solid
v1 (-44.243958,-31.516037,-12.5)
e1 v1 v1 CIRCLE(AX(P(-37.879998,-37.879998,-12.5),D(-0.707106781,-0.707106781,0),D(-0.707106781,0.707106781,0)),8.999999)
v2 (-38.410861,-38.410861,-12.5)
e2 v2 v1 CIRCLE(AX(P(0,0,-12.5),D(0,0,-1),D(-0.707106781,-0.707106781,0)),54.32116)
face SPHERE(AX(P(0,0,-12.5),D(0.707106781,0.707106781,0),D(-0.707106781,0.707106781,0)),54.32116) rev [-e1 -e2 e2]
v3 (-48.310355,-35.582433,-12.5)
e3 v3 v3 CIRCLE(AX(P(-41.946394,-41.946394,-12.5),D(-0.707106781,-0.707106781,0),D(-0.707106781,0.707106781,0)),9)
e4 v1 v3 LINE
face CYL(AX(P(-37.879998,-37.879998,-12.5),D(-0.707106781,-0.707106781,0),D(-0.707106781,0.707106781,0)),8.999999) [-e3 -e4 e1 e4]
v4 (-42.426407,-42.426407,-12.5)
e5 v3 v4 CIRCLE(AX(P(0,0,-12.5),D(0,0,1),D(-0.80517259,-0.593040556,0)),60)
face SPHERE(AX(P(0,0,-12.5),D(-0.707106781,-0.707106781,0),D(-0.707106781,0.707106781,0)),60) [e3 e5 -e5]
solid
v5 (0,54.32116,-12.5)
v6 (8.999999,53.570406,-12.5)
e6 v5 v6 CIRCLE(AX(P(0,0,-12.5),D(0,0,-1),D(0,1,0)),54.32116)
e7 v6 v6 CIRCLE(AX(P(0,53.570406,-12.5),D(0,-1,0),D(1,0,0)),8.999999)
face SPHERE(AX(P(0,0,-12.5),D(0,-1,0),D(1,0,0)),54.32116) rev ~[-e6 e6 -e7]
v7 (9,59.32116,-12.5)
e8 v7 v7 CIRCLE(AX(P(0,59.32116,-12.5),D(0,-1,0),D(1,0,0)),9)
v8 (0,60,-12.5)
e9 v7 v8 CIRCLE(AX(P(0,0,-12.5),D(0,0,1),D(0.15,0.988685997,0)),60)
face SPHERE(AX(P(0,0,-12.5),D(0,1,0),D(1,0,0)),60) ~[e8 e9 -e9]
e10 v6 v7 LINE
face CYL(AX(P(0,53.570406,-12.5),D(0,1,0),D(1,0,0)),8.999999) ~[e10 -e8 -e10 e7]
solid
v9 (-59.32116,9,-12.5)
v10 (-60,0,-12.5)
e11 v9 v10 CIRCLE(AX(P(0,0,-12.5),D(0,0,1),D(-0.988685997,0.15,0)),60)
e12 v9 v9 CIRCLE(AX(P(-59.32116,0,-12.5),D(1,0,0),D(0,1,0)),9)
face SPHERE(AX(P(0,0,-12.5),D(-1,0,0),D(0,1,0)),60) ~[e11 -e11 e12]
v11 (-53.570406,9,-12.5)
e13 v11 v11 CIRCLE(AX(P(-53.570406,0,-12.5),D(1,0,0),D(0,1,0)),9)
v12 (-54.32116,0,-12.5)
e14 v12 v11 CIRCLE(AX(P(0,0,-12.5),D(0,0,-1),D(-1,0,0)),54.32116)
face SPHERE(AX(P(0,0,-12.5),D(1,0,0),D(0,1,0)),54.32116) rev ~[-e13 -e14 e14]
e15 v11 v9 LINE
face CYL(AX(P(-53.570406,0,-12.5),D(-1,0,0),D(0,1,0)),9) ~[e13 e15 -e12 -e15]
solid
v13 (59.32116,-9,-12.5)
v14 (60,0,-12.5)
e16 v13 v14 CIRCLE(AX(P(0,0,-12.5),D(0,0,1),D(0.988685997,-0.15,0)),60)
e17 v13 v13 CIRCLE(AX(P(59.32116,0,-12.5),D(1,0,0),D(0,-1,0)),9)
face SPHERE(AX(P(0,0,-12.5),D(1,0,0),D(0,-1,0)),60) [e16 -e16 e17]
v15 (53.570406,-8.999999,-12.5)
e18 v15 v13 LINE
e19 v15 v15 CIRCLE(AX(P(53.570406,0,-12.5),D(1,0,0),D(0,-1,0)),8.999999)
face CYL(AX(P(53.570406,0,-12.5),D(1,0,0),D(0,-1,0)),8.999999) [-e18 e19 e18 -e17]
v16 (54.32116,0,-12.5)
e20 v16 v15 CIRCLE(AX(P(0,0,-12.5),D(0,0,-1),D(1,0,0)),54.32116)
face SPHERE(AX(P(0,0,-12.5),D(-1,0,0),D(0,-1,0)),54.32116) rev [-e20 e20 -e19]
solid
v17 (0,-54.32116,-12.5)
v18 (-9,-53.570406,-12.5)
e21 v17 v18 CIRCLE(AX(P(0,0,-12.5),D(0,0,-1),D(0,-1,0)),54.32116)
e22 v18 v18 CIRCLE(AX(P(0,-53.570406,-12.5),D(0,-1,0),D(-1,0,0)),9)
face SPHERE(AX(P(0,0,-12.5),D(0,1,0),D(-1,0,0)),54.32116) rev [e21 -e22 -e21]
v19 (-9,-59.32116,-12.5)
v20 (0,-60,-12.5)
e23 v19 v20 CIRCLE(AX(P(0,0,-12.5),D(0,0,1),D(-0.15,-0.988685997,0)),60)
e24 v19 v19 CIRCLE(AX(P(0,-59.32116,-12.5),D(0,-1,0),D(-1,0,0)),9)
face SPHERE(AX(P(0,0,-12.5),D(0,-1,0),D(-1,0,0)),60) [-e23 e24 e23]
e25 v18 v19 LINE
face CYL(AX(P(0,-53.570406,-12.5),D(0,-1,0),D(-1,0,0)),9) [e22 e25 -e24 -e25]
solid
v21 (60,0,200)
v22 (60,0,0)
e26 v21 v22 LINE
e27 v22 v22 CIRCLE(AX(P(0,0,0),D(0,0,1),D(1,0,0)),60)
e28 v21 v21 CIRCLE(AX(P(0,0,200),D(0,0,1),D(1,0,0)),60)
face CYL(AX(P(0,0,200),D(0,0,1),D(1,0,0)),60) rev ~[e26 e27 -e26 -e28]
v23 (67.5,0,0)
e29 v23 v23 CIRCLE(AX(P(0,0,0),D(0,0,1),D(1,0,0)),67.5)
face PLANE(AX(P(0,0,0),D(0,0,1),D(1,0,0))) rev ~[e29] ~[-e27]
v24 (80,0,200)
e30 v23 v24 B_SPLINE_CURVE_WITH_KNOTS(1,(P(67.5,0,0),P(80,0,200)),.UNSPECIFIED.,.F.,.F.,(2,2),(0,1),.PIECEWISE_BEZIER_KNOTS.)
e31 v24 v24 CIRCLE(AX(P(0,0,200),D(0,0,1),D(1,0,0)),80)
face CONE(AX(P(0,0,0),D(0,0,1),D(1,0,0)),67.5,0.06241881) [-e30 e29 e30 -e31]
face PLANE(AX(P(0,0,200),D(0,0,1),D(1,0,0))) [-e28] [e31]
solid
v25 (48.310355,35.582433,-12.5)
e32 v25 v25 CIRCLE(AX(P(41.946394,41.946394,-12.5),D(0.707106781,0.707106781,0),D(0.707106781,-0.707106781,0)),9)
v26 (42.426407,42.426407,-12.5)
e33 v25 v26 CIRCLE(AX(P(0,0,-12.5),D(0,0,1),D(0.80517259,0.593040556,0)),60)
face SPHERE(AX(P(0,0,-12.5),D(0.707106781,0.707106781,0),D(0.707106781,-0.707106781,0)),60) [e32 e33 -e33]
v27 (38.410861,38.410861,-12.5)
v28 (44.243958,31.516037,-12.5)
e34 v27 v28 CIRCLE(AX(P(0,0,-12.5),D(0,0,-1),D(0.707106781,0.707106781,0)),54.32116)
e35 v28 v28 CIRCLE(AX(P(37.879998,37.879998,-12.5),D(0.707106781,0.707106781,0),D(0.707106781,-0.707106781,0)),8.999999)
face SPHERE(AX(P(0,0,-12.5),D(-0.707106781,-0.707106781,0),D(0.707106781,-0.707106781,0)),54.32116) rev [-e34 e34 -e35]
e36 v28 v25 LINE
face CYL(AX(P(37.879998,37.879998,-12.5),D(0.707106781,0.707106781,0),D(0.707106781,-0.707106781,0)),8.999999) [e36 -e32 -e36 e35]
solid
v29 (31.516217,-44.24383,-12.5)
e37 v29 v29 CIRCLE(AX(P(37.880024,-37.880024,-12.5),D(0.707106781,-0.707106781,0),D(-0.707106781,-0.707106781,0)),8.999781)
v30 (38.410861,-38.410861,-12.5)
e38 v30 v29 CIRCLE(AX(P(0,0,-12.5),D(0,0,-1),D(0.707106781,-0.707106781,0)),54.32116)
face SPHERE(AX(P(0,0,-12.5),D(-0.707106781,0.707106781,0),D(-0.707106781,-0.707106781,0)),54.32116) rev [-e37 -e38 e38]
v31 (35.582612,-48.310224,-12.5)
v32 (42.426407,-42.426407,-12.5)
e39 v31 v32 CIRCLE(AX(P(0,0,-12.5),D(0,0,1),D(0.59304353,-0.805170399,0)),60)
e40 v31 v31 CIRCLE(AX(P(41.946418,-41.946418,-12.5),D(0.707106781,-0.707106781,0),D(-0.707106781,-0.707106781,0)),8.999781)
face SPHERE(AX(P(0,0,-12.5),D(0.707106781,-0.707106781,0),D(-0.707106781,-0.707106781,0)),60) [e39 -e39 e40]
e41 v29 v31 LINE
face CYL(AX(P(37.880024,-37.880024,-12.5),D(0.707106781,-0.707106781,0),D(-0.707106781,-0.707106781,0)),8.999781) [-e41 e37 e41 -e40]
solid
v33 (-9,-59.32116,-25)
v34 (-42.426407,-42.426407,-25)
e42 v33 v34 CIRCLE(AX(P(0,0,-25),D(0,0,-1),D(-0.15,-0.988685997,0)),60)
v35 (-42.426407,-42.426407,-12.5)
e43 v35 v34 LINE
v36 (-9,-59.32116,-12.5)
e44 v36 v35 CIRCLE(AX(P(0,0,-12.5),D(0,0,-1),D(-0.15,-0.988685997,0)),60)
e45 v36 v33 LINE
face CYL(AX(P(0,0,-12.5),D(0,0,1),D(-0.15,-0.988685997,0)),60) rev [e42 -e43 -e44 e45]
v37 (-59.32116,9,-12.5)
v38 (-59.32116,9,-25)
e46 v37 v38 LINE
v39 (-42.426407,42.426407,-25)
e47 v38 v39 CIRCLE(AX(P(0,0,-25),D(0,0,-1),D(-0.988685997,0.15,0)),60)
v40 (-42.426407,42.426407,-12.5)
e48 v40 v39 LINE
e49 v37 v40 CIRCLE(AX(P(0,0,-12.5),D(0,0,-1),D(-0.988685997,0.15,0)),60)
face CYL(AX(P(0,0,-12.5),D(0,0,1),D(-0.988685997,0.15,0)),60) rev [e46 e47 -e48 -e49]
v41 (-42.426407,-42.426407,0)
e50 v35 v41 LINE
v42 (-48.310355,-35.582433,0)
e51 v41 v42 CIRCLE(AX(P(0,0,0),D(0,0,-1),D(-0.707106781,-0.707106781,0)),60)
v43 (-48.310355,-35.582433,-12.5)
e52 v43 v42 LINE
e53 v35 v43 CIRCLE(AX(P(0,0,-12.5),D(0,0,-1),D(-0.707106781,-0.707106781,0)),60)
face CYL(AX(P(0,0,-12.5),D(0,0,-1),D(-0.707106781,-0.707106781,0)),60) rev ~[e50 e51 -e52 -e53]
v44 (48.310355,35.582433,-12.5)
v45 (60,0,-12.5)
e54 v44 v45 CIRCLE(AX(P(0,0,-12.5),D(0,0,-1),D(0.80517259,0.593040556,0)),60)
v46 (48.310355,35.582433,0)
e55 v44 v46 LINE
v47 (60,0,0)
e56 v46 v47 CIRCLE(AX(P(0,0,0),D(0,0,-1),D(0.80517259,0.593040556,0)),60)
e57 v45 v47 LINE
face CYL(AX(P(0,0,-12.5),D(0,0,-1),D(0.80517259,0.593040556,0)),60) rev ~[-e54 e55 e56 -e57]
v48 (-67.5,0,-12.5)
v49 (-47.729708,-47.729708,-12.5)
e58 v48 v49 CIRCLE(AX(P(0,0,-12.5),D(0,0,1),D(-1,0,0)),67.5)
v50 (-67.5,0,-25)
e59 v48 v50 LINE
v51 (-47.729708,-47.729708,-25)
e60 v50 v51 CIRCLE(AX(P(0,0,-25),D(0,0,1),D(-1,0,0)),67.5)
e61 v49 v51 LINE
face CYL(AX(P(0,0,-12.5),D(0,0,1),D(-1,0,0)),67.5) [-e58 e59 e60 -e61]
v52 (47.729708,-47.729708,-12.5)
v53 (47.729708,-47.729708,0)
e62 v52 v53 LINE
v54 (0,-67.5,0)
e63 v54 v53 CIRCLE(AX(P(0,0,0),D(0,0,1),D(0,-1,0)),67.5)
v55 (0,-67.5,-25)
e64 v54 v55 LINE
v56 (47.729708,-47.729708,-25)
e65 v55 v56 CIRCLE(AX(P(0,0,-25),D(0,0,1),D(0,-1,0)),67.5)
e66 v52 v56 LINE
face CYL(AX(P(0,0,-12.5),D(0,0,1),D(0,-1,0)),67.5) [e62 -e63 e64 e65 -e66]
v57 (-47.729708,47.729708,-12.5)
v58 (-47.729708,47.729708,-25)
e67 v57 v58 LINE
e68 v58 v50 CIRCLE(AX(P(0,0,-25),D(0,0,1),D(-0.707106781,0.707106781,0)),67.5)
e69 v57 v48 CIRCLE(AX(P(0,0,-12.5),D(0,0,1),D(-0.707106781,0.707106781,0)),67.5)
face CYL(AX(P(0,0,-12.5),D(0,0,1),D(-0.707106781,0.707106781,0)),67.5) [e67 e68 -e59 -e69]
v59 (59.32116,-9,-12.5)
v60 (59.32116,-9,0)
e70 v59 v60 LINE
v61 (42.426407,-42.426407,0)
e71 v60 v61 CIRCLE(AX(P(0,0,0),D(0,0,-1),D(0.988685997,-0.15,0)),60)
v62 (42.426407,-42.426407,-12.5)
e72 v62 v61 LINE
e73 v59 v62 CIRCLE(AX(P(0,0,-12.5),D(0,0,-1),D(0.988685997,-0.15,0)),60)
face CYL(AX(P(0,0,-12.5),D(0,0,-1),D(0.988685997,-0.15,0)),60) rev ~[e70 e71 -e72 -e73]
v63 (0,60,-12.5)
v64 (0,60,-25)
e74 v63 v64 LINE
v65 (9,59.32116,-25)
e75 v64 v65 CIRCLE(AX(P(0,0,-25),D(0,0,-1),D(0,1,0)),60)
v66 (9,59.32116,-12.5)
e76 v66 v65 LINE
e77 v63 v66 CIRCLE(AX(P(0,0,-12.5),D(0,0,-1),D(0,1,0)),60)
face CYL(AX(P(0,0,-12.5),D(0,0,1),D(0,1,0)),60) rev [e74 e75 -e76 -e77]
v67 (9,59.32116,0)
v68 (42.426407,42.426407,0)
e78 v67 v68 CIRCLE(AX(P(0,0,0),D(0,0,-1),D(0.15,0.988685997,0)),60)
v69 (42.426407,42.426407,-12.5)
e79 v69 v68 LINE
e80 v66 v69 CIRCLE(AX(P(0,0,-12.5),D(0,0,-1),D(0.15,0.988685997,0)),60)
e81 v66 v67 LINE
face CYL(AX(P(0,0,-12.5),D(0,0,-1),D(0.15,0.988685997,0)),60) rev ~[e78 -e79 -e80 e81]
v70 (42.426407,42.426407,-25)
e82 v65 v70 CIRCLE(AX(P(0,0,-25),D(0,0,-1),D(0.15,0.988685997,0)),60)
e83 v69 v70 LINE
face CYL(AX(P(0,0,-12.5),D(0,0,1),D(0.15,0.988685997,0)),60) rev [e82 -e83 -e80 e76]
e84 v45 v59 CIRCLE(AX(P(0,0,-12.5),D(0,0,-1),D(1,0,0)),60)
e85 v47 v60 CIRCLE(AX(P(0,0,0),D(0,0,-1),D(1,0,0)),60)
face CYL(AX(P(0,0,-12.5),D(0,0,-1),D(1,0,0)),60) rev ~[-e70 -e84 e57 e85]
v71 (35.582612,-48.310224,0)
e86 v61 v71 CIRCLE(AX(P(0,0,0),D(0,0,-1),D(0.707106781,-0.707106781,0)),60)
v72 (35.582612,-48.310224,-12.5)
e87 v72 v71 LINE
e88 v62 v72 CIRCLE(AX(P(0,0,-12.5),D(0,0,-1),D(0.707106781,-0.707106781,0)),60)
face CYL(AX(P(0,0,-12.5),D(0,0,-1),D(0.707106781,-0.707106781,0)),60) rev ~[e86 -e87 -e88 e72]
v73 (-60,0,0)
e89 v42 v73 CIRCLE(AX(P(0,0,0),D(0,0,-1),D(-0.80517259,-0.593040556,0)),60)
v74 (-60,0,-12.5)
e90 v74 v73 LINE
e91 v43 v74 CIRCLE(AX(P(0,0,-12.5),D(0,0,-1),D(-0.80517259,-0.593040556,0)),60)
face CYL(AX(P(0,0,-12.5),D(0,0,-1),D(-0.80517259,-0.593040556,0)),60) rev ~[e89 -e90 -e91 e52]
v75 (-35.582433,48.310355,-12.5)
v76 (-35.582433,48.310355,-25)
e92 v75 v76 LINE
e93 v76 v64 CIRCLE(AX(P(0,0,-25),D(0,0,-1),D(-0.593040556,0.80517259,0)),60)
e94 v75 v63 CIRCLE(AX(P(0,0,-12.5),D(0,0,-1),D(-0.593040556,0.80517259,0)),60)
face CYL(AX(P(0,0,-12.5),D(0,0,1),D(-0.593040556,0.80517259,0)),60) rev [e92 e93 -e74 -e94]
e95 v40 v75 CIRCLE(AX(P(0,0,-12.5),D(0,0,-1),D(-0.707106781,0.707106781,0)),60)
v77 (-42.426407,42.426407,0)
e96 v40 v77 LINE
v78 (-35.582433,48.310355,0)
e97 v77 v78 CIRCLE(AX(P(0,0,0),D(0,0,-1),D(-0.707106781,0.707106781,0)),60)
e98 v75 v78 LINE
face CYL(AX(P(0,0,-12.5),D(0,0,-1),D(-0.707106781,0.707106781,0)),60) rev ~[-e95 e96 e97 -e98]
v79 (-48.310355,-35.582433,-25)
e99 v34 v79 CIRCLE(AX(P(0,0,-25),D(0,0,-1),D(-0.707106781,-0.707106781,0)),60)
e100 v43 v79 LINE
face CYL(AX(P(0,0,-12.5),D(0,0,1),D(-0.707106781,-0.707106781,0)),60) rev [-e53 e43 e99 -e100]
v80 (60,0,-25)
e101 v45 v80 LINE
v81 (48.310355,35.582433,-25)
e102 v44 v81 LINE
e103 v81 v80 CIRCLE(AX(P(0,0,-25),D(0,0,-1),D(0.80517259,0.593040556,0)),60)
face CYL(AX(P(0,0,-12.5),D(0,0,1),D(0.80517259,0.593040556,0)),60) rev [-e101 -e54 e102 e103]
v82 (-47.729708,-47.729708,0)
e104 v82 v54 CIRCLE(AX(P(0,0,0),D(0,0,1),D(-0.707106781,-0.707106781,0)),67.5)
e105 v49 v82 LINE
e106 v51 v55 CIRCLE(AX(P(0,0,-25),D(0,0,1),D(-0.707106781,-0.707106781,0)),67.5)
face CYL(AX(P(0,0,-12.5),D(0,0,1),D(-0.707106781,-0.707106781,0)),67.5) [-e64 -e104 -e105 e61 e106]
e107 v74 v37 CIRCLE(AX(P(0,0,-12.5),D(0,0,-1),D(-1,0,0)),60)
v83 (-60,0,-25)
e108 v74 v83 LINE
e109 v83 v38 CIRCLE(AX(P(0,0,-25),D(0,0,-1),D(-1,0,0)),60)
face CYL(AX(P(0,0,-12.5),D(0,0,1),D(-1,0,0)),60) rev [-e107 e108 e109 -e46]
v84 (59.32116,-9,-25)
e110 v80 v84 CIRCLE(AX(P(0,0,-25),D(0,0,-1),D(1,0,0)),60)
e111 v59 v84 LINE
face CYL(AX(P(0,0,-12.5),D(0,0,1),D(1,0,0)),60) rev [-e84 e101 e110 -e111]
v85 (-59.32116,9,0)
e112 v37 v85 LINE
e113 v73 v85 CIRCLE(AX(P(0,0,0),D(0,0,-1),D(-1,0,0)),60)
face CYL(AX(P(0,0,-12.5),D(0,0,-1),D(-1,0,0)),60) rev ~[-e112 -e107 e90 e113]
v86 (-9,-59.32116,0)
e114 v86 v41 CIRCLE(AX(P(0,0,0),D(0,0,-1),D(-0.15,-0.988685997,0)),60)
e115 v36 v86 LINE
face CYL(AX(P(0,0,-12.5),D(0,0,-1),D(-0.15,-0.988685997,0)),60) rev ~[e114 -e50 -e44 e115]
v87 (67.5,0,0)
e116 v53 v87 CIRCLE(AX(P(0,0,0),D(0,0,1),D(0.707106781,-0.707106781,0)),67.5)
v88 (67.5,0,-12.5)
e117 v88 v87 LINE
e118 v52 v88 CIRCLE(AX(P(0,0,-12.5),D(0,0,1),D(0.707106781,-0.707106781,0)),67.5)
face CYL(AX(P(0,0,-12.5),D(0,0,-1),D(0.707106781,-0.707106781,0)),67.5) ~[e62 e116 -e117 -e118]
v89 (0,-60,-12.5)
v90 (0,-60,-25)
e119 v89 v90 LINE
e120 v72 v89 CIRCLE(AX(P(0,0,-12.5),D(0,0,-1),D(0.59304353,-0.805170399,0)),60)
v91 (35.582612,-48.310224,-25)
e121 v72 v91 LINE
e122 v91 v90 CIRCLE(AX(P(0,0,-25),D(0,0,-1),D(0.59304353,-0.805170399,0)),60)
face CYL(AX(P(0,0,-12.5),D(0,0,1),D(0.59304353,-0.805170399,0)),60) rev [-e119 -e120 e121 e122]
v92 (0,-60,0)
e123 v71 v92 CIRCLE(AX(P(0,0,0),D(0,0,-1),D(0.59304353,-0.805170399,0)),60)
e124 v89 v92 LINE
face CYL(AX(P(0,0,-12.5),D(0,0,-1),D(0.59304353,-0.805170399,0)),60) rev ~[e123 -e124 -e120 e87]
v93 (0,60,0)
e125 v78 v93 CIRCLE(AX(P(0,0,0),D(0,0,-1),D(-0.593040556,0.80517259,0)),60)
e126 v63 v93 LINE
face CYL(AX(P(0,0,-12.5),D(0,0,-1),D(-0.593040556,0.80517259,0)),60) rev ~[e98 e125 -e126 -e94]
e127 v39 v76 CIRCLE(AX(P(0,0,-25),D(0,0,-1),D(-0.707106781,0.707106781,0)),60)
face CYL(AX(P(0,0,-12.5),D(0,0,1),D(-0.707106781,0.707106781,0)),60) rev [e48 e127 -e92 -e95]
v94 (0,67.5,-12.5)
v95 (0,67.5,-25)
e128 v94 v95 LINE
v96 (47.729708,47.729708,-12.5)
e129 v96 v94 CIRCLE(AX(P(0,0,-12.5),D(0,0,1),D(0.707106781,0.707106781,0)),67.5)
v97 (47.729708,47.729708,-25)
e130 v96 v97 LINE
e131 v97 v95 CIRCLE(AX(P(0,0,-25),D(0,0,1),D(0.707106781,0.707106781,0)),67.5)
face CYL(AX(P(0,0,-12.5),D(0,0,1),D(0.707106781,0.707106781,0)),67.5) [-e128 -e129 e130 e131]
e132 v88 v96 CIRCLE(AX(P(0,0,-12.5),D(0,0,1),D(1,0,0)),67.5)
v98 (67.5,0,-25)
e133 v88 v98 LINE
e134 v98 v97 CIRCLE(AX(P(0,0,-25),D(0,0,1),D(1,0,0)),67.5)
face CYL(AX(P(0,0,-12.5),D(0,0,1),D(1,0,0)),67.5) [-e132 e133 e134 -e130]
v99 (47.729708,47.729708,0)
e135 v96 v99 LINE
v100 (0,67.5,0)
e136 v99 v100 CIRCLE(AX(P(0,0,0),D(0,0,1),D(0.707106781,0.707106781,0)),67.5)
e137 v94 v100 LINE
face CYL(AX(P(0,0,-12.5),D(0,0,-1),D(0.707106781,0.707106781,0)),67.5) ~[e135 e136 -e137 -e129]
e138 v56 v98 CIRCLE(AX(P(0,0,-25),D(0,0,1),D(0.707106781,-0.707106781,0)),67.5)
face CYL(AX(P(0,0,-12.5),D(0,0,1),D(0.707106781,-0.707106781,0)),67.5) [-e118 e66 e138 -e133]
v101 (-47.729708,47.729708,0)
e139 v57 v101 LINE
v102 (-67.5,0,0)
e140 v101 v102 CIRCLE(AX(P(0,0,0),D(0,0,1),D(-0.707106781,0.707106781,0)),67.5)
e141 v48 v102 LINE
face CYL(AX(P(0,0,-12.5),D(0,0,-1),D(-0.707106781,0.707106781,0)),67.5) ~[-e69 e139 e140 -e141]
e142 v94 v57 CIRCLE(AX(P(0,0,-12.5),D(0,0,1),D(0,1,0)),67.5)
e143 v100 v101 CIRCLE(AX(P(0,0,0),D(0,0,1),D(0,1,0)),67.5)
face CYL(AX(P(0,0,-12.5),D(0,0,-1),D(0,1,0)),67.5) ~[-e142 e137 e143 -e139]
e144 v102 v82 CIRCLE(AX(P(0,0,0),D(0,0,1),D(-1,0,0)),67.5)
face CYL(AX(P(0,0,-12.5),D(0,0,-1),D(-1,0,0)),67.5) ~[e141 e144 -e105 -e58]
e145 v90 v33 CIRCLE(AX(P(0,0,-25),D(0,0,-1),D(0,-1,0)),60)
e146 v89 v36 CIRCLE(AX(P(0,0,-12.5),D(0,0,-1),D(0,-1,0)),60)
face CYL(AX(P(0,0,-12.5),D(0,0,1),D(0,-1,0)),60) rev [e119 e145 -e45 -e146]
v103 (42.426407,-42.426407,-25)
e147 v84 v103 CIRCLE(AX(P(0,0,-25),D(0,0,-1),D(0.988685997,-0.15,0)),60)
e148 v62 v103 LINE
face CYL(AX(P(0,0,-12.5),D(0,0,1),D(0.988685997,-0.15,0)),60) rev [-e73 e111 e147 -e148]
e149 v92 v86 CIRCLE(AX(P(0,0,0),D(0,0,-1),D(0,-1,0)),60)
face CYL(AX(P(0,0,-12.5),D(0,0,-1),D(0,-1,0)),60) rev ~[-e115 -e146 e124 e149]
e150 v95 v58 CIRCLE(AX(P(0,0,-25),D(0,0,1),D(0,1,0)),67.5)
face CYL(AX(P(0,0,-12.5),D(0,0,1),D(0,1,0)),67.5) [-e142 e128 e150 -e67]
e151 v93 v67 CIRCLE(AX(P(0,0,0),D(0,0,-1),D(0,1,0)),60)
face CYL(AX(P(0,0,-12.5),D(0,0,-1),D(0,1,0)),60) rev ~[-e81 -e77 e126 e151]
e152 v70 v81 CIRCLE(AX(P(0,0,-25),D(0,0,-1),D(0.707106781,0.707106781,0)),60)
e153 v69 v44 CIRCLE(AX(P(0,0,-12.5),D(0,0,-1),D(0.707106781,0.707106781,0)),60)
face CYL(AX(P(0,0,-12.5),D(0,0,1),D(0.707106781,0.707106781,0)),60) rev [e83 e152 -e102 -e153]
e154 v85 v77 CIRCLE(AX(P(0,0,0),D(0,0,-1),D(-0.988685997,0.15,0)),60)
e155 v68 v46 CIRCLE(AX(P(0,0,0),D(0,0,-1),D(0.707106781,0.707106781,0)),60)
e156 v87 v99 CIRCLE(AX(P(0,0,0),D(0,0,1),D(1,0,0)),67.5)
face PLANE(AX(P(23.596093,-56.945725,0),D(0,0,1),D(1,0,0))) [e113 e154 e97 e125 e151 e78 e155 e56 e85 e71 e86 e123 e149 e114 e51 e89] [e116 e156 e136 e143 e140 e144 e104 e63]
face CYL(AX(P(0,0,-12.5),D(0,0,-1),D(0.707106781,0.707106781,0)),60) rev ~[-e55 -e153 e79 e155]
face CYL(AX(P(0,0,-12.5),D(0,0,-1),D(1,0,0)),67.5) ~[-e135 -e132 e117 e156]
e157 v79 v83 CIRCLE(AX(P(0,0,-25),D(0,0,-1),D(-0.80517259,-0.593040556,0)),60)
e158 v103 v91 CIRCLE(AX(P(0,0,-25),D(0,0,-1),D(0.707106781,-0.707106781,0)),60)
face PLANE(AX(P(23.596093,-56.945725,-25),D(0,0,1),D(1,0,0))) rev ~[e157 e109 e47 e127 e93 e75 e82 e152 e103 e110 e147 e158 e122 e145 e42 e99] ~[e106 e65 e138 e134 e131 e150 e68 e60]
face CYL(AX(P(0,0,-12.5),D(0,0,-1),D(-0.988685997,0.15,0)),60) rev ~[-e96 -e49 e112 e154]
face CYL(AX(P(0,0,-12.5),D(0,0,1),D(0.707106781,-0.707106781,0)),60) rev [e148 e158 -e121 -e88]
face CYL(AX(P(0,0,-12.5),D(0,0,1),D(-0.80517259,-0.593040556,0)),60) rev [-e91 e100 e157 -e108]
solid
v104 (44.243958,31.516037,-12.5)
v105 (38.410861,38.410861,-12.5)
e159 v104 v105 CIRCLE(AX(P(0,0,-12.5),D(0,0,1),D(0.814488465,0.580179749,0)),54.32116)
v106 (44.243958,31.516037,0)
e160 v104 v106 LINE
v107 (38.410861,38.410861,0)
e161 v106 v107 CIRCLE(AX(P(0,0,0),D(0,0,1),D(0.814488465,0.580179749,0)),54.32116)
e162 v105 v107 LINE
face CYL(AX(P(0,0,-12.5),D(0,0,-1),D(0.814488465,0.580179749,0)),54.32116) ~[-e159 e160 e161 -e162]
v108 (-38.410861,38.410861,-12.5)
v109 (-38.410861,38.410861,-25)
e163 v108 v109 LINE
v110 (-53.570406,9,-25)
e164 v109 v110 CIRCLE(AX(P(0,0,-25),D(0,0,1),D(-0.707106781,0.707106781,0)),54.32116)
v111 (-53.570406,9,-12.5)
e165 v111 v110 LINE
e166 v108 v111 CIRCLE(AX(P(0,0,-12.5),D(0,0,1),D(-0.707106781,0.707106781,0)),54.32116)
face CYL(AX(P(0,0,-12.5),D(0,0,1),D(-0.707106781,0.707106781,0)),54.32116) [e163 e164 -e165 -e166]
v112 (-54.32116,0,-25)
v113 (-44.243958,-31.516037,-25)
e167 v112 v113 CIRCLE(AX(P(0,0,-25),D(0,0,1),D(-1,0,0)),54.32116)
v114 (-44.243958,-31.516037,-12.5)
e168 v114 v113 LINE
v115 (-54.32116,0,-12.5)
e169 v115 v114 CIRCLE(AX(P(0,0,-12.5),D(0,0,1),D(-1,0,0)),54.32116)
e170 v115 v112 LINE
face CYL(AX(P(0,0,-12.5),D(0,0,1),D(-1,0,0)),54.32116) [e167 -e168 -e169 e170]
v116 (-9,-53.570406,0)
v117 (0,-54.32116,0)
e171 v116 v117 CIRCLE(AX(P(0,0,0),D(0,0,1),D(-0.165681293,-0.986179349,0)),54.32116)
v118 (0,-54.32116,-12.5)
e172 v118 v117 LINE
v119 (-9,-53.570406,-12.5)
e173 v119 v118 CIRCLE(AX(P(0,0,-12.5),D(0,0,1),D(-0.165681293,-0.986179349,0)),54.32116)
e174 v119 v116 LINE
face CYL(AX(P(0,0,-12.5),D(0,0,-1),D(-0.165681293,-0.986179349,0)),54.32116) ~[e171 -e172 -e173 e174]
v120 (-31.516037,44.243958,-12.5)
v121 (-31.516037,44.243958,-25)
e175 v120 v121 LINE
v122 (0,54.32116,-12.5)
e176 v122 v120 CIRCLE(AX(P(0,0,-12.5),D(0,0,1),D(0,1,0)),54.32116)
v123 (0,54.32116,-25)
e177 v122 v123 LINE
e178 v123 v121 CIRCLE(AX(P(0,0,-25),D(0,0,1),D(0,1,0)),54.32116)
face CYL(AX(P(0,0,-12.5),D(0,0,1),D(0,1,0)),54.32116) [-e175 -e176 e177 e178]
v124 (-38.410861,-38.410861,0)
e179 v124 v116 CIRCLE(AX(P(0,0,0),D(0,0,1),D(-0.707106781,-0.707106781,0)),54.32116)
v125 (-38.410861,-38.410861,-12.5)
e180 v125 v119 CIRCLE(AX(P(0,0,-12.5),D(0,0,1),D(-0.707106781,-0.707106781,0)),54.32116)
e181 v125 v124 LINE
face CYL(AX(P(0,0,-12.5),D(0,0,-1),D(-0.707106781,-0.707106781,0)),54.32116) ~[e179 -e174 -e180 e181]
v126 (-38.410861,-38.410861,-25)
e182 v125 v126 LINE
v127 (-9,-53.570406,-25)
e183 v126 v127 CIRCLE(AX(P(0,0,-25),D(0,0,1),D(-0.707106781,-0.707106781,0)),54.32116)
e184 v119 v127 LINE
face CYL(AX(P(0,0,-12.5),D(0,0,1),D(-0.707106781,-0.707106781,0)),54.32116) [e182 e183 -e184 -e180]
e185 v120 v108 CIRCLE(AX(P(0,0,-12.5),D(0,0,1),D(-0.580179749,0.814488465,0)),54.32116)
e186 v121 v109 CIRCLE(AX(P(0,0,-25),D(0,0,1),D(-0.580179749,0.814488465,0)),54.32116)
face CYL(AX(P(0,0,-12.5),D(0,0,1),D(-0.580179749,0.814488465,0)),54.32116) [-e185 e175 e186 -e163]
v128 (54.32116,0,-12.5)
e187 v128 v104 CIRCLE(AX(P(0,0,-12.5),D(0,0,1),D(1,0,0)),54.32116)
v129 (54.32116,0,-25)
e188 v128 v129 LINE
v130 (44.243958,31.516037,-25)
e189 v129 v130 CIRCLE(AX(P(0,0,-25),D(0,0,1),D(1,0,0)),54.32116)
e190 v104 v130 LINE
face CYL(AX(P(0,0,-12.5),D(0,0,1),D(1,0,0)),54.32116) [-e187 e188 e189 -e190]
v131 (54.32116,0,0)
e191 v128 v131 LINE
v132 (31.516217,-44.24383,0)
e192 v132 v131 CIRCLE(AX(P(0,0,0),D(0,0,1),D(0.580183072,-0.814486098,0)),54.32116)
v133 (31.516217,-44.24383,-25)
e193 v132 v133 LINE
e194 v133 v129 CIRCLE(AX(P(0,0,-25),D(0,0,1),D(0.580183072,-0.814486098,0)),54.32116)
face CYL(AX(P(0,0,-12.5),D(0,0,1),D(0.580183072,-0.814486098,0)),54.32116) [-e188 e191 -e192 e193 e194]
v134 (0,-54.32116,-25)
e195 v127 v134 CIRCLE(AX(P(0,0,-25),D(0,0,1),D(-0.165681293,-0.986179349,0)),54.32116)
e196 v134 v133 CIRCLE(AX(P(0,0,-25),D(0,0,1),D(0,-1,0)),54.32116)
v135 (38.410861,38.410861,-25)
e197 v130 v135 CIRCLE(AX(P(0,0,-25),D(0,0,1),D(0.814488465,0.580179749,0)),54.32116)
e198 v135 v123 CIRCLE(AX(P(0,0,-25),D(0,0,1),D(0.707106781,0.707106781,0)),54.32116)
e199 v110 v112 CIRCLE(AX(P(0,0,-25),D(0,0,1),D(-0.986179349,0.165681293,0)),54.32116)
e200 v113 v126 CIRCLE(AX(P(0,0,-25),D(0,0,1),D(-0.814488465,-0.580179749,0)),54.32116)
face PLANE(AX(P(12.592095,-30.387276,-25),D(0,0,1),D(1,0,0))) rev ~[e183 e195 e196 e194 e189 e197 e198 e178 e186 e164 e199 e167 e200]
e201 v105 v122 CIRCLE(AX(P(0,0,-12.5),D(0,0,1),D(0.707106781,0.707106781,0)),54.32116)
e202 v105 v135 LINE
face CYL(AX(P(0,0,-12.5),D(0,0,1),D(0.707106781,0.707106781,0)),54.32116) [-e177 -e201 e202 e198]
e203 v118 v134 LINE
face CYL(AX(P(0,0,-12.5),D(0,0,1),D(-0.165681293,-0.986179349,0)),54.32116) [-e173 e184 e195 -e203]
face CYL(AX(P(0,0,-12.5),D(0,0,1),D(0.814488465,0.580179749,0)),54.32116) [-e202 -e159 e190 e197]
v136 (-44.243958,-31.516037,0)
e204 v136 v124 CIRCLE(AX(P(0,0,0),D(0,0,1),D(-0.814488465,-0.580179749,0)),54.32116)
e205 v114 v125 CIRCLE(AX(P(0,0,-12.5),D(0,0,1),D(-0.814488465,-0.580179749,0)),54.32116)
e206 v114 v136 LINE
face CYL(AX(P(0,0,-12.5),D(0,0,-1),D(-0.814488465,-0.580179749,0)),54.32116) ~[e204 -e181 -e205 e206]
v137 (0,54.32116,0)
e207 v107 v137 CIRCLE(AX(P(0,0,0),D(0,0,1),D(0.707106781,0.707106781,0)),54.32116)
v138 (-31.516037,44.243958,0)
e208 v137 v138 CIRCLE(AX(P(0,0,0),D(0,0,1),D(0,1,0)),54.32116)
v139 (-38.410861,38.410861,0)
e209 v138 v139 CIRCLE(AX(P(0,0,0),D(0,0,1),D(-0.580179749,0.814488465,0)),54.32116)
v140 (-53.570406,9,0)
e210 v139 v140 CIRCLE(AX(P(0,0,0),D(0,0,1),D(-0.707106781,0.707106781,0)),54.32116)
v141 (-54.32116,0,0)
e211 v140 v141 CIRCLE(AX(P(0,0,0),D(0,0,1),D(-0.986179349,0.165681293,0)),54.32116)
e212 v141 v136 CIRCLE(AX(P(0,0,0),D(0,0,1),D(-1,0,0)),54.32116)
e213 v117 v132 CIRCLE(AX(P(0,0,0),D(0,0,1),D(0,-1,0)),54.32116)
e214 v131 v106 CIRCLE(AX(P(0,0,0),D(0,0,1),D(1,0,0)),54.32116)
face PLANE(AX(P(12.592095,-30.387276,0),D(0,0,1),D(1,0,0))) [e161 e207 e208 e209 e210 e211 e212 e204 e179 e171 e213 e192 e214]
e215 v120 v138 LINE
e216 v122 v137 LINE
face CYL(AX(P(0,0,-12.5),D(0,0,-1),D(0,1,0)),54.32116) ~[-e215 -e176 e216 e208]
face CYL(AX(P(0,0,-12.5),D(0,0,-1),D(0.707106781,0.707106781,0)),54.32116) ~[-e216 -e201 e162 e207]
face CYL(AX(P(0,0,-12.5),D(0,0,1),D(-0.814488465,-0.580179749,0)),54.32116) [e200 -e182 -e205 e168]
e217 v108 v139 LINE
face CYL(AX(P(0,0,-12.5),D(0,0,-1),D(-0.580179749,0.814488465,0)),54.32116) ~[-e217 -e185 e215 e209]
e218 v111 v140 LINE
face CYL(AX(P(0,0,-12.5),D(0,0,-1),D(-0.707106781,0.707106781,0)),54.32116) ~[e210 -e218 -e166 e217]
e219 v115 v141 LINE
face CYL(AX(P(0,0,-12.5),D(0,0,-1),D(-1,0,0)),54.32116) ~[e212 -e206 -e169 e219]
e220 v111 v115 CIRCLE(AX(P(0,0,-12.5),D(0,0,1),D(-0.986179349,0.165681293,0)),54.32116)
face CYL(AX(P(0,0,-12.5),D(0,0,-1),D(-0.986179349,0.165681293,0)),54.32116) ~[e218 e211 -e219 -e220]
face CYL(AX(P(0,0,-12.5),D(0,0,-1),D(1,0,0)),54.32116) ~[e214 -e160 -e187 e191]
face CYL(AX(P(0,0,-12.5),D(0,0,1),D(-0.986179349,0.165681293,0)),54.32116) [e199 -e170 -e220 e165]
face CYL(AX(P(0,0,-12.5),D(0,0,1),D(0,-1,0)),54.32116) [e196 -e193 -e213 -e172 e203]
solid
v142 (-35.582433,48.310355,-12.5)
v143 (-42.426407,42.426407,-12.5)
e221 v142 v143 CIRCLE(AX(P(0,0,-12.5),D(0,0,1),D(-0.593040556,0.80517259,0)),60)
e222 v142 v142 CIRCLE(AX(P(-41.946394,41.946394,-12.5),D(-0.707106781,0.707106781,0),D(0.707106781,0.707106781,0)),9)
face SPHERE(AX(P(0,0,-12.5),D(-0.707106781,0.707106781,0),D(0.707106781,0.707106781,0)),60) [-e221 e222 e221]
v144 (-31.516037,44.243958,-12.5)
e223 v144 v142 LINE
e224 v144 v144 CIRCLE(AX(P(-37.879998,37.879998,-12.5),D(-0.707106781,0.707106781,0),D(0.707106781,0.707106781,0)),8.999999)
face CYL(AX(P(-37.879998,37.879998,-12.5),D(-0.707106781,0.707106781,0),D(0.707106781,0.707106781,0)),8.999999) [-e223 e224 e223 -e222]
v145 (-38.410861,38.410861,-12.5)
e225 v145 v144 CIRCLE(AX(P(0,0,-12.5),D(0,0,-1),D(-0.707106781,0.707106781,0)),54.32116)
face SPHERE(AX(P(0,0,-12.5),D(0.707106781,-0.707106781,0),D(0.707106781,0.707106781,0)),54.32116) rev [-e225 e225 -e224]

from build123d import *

# Parameters (mm, degrees)
F0_R      = 67.5
F2_R      = 80
F4_R      = 60
F5_DEPTH  = 200
F14_DEPTH = 12.5
F15_DEPTH = 12.5


# Not quite as in the source:
# - ends of sketch curves that miss each other by under 0.0002 mm in the source are joined


with BuildPart() as f3:
    # F0 (on Top) → F3 section 0
    with BuildSketch(Plane.XY):
        Circle(F0_R)
    # F2 (on offset) → F3 section 1
    with BuildSketch(Plane.XY.offset(200)):
        Circle(F2_R)
    loft()

    # F4 (on face) → F5 (cut)
    with BuildSketch(Plane.XY.offset(200)):
        Circle(F4_R)
    extrude(amount=-F5_DEPTH, mode=Mode.SUBTRACT)


with BuildPart() as f8:
    # F7 (on offset) → F8 (revolve)
    with BuildSketch(Plane.XY.offset(-12.5)):
        with BuildLine():
            ThreePointArc((48.310355393, 35.5824333316), (45.4972526643, 39.1152144312), (42.4264068712, 42.4264068712))
            Line((42.4264068712, 42.4264068712), (38.4108605979, 38.4108605979))
            ThreePointArc((38.4108605979, 38.4108605979), (41.4709466498, 35.0848828944), (44.2439582044, 31.5160369677))
            Line((44.2439582044, 31.5160369677), (48.310355393, 35.5824333316))
        make_face()
    revolve(axis=Axis((45.6196608726, 45.6196608726, -12.5), (0.7071067812, 0.7071067812, 0)))


with BuildPart() as f9:
    # F7 (on offset) → F9 (revolve)
    with BuildSketch(Plane.XY.offset(-12.5)):
        with BuildLine():
            ThreePointArc((-9, -59.3211597999), (-4.5127825124, -59.8300492562), (0, -60))
            Line((0, -60), (0, -54.32116))
            ThreePointArc((0, -54.32116), (-4.5156292812, -54.1331461855), (-9, -53.5704062309))
            Line((-9, -53.5704062309), (-9, -59.3211597999))
        make_face()
    revolve(axis=Axis((0, -9.3066766858, -12.5), (0, -1, 0)))


with BuildPart() as f9b:
    # F7 (on offset) → F9, piece 2 (revolve)
    with BuildSketch(Plane.XY.offset(-12.5)):
        with BuildLine():
            ThreePointArc((9, 59.3211597999), (4.5127825124, 59.8300492562), (0, 60))
            Line((0, 60), (0, 54.32116))
            ThreePointArc((0, 54.32116), (4.5156289866, 54.1331462101), (8.9999994169, 53.5704063289))
            Line((8.9999994169, 53.5704063289), (9, 59.3211597999))
        make_face()
    revolve(axis=Axis((0, -9.3066766858, -12.5), (0, -1, 0)))


with BuildPart() as f10:
    # F7 (on offset) → F10 (revolve)
    with BuildSketch(Plane.XY.offset(-12.5)):
        with BuildLine():
            ThreePointArc((35.582611792, -48.3102239496), (39.1152984656, -45.4971804176), (42.4264068712, -42.4264068712))
            Line((42.4264068712, -42.4264068712), (38.4108605979, -38.4108605979))
            ThreePointArc((38.4108605979, -38.4108605979), (35.0849674891, -41.4708750816), (31.5162174701, -44.2438296277))
            Line((31.5162174701, -44.2438296277), (35.582611792, -48.3102239496))
        make_face()
    revolve(axis=Axis((39.3175072968, -39.3175072968, -12.5), (0.7071067812, -0.7071067812, 0)))


with BuildPart() as f11:
    # F7 (on offset) → F11 (revolve)
    with BuildSketch(Plane.XY.offset(-12.5)):
        with BuildLine():
            ThreePointArc((-35.5824333316, 48.310355393), (-39.1152144312, 45.4972526643), (-42.4264068712, 42.4264068712))
            Line((-42.4264068712, 42.4264068712), (-38.4108605979, 38.4108605979))
            ThreePointArc((-38.4108605979, 38.4108605979), (-35.0848828944, 41.4709466498), (-31.5160369677, 44.2439582044))
            Line((-31.5160369677, 44.2439582044), (-35.5824333316, 48.310355393))
        make_face()
    revolve(axis=Axis((-40.7037734985, 40.7037734985, -12.5), (-0.7071067812, 0.7071067812, 0)))


with BuildPart() as f12:
    # F7 (on offset) → F12 (revolve)
    with BuildSketch(Plane.XY.offset(-12.5)):
        with BuildLine():
            ThreePointArc((59.3211597999, -9), (59.8300492562, -4.5127825124), (60, 0))
            Line((60, 0), (54.32116, 0))
            ThreePointArc((54.32116, 0), (54.1331462101, -4.5156289866), (53.5704063289, -8.9999994169))
            Line((53.5704063289, -8.9999994169), (59.3211597999, -9))
        make_face()
    revolve(axis=Axis((7.4657537043, 0, -12.5), (1, 0, 0)))


with BuildPart() as f12b:
    # F7 (on offset) → F12, piece 2 (revolve)
    with BuildSketch(Plane.XY.offset(-12.5)):
        with BuildLine():
            Line((-60, 0), (-54.32116, 0))
            ThreePointArc((-54.32116, 0), (-54.1331461855, 4.5156292812), (-53.5704062309, 9))
            Line((-53.5704062309, 9), (-59.3211597999, 9))
            ThreePointArc((-59.3211597999, 9), (-59.8300492562, 4.5127825124), (-60, 0))
        make_face()
    revolve(axis=Axis((7.4657537043, 0, -12.5), (1, 0, 0)))


with BuildPart() as f13:
    # F7 (on offset) → F13 (revolve)
    with BuildSketch(Plane.XY.offset(-12.5)):
        with BuildLine():
            ThreePointArc((-48.310355393, -35.5824333316), (-45.4972526643, -39.1152144312), (-42.4264068712, -42.4264068712))
            Line((-42.4264068712, -42.4264068712), (-38.4108605979, -38.4108605979))
            ThreePointArc((-38.4108605979, -38.4108605979), (-41.4709466498, -35.0848828944), (-44.2439582044, -31.5160369677))
            Line((-44.2439582044, -31.5160369677), (-48.310355393, -35.5824333316))
        make_face()
    revolve(axis=Axis((-38.4108605979, -38.4108605979, -12.5), (-0.7071067812, -0.7071067812, 0)))


with BuildPart() as f14:
    # F7 (on offset) → F14 (new body, symmetric)
    with BuildSketch(Plane.XY.offset(-12.5)):
        with BuildLine():
            ThreePointArc((0, -67.5), (25.8311316846, -62.3618684445), (47.7297077301, -47.7297077301))
            Line((47.7297077301, -47.7297077301), (42.4264068712, -42.4264068712))
            ThreePointArc((42.4264068712, -42.4264068712), (39.1152984656, -45.4971804176), (35.582611792, -48.3102239496))
            ThreePointArc((35.582611792, -48.3102239496), (18.7268064953, -57.0026904495), (0, -60))
            Line((0, -60), (0, -67.5))
        make_face()
        with BuildLine():
            ThreePointArc((-47.7297077301, -47.7297077301), (-25.8311316846, -62.3618684445), (0, -67.5))
            Line((0, -67.5), (0, -60))
            ThreePointArc((0, -60), (-4.5127825124, -59.8300492562), (-9, -59.3211597999))
            ThreePointArc((-9, -59.3211597999), (-27.0652360058, -53.5487908355), (-42.4264068712, -42.4264068712))
            Line((-42.4264068712, -42.4264068712), (-47.7297077301, -47.7297077301))
        make_face()
        with BuildLine():
            ThreePointArc((-67.5, 0), (-62.3618684445, -25.8311316846), (-47.7297077301, -47.7297077301))
            Line((-47.7297077301, -47.7297077301), (-42.4264068712, -42.4264068712))
            ThreePointArc((-42.4264068712, -42.4264068712), (-45.4972526643, -39.1152144312), (-48.310355393, -35.5824333316))
            ThreePointArc((-48.310355393, -35.5824333316), (-57.0027250383, -18.72670121), (-60, 0))
            Line((-60, 0), (-67.5, 0))
        make_face()
        with BuildLine():
            Line((-42.4264068712, 42.4264068712), (-47.7297077301, 47.7297077301))
            ThreePointArc((-47.7297077301, 47.7297077301), (-62.3618684445, 25.8311316846), (-67.5, 0))
            Line((-67.5, 0), (-60, 0))
            ThreePointArc((-60, 0), (-59.8300492562, 4.5127825124), (-59.3211597999, 9))
            ThreePointArc((-59.3211597999, 9), (-53.5487908355, 27.0652360058), (-42.4264068712, 42.4264068712))
        make_face()
        with BuildLine():
            Line((0, 60), (0, 67.5))
            ThreePointArc((0, 67.5), (-25.8311316846, 62.3618684445), (-47.7297077301, 47.7297077301))
            Line((-47.7297077301, 47.7297077301), (-42.4264068712, 42.4264068712))
            ThreePointArc((-42.4264068712, 42.4264068712), (-39.1152144312, 45.4972526643), (-35.5824333316, 48.310355393))
            ThreePointArc((-35.5824333316, 48.310355393), (-18.72670121, 57.0027250383), (0, 60))
        make_face()
        with BuildLine():
            Line((42.4264068712, 42.4264068712), (47.7297077301, 47.7297077301))
            ThreePointArc((47.7297077301, 47.7297077301), (25.8311316846, 62.3618684445), (0, 67.5))
            Line((0, 67.5), (0, 60))
            ThreePointArc((0, 60), (4.5127825124, 59.8300492562), (9, 59.3211597999))
            ThreePointArc((9, 59.3211597999), (27.0652360058, 53.5487908355), (42.4264068712, 42.4264068712))
        make_face()
        with BuildLine():
            Line((60, 0), (67.5, 0))
            ThreePointArc((67.5, 0), (62.3618684445, 25.8311316846), (47.7297077301, 47.7297077301))
            Line((47.7297077301, 47.7297077301), (42.4264068712, 42.4264068712))
            ThreePointArc((42.4264068712, 42.4264068712), (45.4972526643, 39.1152144312), (48.310355393, 35.5824333316))
            ThreePointArc((48.310355393, 35.5824333316), (57.0027250383, 18.72670121), (60, 0))
        make_face()
        with BuildLine():
            ThreePointArc((47.7297077301, -47.7297077301), (62.3618684445, -25.8311316846), (67.5, 0))
            Line((67.5, 0), (60, 0))
            ThreePointArc((60, 0), (59.8300492562, -4.5127825124), (59.3211597999, -9))
            ThreePointArc((59.3211597999, -9), (53.5487908355, -27.0652360058), (42.4264068712, -42.4264068712))
            Line((42.4264068712, -42.4264068712), (47.7297077301, -47.7297077301))
        make_face()
    extrude(amount=F14_DEPTH, both=True)


with BuildPart() as f15:
    # F7 (on offset) → F15 (new body, symmetric)
    with BuildSketch(Plane.XY.offset(-12.5)):
        with BuildLine():
            ThreePointArc((31.5162174701, -44.2438296277), (35.0849674891, -41.4708750816), (38.4108605979, -38.4108605979))
            Line((38.4108605979, -38.4108605979), (0, 0))
            Line((0, 0), (0, -54.32116))
            ThreePointArc((0, -54.32116), (16.5440665425, -51.7405284664), (31.5162174701, -44.2438296277))
        make_face()
        with BuildLine():
            Line((0, -54.32116), (0, 0))
            Line((0, 0), (-38.4108605979, -38.4108605979))
            ThreePointArc((-38.4108605979, -38.4108605979), (-24.8877556563, -48.2844492786), (-9, -53.5704062309))
            ThreePointArc((-9, -53.5704062309), (-4.5156292812, -54.1331461855), (0, -54.32116))
        make_face()
        with BuildLine():
            Line((-38.4108605979, -38.4108605979), (0, 0))
            Line((0, 0), (-54.32116, 0))
            ThreePointArc((-54.32116, 0), (-51.7405622138, -16.5439609993), (-44.2439582044, -31.5160369677))
            ThreePointArc((-44.2439582044, -31.5160369677), (-41.4709466498, -35.0848828944), (-38.4108605979, -38.4108605979))
        make_face()
        with BuildLine():
            Line((-54.32116, 0), (0, 0))
            Line((0, 0), (-38.4108605979, 38.4108605979))
            ThreePointArc((-38.4108605979, 38.4108605979), (-48.2844492786, 24.8877556563), (-53.5704062309, 9))
            ThreePointArc((-53.5704062309, 9), (-54.1331461855, 4.5156292812), (-54.32116, 0))
        make_face()
        with BuildLine():
            Line((-38.4108605979, 38.4108605979), (0, 0))
            Line((0, 0), (0, 54.32116))
            ThreePointArc((0, 54.32116), (-16.5439609993, 51.7405622138), (-31.5160369677, 44.2439582044))
            ThreePointArc((-31.5160369677, 44.2439582044), (-35.0848828944, 41.4709466498), (-38.4108605979, 38.4108605979))
        make_face()
        with BuildLine():
            Line((0, 0), (38.4108605979, 38.4108605979))
            ThreePointArc((38.4108605979, 38.4108605979), (24.8877553935, 48.284449414), (8.9999994169, 53.5704063289))
            ThreePointArc((8.9999994169, 53.5704063289), (4.5156289866, 54.1331462101), (0, 54.32116))
            Line((0, 54.32116), (0, 0))
        make_face()
        with BuildLine():
            Line((0, 0), (54.32116, 0))
            ThreePointArc((54.32116, 0), (51.7405622138, 16.5439609993), (44.2439582044, 31.5160369677))
            ThreePointArc((44.2439582044, 31.5160369677), (41.4709466498, 35.0848828944), (38.4108605979, 38.4108605979))
            Line((38.4108605979, 38.4108605979), (0, 0))
        make_face()
        with BuildLine():
            ThreePointArc((53.5704063289, -8.9999994169), (54.1331462101, -4.5156289866), (54.32116, 0))
            Line((54.32116, 0), (0, 0))
            Line((0, 0), (38.4108605979, -38.4108605979))
            ThreePointArc((38.4108605979, -38.4108605979), (48.284449414, -24.8877553935), (53.5704063289, -8.9999994169))
        make_face()
    extrude(amount=F15_DEPTH, both=True)


solid = Compound([f3.part, f8.part, f9.part, f9b.part, f10.part, f11.part, f12.part, f12b.part, f13.part, f14.part, f15.part])
